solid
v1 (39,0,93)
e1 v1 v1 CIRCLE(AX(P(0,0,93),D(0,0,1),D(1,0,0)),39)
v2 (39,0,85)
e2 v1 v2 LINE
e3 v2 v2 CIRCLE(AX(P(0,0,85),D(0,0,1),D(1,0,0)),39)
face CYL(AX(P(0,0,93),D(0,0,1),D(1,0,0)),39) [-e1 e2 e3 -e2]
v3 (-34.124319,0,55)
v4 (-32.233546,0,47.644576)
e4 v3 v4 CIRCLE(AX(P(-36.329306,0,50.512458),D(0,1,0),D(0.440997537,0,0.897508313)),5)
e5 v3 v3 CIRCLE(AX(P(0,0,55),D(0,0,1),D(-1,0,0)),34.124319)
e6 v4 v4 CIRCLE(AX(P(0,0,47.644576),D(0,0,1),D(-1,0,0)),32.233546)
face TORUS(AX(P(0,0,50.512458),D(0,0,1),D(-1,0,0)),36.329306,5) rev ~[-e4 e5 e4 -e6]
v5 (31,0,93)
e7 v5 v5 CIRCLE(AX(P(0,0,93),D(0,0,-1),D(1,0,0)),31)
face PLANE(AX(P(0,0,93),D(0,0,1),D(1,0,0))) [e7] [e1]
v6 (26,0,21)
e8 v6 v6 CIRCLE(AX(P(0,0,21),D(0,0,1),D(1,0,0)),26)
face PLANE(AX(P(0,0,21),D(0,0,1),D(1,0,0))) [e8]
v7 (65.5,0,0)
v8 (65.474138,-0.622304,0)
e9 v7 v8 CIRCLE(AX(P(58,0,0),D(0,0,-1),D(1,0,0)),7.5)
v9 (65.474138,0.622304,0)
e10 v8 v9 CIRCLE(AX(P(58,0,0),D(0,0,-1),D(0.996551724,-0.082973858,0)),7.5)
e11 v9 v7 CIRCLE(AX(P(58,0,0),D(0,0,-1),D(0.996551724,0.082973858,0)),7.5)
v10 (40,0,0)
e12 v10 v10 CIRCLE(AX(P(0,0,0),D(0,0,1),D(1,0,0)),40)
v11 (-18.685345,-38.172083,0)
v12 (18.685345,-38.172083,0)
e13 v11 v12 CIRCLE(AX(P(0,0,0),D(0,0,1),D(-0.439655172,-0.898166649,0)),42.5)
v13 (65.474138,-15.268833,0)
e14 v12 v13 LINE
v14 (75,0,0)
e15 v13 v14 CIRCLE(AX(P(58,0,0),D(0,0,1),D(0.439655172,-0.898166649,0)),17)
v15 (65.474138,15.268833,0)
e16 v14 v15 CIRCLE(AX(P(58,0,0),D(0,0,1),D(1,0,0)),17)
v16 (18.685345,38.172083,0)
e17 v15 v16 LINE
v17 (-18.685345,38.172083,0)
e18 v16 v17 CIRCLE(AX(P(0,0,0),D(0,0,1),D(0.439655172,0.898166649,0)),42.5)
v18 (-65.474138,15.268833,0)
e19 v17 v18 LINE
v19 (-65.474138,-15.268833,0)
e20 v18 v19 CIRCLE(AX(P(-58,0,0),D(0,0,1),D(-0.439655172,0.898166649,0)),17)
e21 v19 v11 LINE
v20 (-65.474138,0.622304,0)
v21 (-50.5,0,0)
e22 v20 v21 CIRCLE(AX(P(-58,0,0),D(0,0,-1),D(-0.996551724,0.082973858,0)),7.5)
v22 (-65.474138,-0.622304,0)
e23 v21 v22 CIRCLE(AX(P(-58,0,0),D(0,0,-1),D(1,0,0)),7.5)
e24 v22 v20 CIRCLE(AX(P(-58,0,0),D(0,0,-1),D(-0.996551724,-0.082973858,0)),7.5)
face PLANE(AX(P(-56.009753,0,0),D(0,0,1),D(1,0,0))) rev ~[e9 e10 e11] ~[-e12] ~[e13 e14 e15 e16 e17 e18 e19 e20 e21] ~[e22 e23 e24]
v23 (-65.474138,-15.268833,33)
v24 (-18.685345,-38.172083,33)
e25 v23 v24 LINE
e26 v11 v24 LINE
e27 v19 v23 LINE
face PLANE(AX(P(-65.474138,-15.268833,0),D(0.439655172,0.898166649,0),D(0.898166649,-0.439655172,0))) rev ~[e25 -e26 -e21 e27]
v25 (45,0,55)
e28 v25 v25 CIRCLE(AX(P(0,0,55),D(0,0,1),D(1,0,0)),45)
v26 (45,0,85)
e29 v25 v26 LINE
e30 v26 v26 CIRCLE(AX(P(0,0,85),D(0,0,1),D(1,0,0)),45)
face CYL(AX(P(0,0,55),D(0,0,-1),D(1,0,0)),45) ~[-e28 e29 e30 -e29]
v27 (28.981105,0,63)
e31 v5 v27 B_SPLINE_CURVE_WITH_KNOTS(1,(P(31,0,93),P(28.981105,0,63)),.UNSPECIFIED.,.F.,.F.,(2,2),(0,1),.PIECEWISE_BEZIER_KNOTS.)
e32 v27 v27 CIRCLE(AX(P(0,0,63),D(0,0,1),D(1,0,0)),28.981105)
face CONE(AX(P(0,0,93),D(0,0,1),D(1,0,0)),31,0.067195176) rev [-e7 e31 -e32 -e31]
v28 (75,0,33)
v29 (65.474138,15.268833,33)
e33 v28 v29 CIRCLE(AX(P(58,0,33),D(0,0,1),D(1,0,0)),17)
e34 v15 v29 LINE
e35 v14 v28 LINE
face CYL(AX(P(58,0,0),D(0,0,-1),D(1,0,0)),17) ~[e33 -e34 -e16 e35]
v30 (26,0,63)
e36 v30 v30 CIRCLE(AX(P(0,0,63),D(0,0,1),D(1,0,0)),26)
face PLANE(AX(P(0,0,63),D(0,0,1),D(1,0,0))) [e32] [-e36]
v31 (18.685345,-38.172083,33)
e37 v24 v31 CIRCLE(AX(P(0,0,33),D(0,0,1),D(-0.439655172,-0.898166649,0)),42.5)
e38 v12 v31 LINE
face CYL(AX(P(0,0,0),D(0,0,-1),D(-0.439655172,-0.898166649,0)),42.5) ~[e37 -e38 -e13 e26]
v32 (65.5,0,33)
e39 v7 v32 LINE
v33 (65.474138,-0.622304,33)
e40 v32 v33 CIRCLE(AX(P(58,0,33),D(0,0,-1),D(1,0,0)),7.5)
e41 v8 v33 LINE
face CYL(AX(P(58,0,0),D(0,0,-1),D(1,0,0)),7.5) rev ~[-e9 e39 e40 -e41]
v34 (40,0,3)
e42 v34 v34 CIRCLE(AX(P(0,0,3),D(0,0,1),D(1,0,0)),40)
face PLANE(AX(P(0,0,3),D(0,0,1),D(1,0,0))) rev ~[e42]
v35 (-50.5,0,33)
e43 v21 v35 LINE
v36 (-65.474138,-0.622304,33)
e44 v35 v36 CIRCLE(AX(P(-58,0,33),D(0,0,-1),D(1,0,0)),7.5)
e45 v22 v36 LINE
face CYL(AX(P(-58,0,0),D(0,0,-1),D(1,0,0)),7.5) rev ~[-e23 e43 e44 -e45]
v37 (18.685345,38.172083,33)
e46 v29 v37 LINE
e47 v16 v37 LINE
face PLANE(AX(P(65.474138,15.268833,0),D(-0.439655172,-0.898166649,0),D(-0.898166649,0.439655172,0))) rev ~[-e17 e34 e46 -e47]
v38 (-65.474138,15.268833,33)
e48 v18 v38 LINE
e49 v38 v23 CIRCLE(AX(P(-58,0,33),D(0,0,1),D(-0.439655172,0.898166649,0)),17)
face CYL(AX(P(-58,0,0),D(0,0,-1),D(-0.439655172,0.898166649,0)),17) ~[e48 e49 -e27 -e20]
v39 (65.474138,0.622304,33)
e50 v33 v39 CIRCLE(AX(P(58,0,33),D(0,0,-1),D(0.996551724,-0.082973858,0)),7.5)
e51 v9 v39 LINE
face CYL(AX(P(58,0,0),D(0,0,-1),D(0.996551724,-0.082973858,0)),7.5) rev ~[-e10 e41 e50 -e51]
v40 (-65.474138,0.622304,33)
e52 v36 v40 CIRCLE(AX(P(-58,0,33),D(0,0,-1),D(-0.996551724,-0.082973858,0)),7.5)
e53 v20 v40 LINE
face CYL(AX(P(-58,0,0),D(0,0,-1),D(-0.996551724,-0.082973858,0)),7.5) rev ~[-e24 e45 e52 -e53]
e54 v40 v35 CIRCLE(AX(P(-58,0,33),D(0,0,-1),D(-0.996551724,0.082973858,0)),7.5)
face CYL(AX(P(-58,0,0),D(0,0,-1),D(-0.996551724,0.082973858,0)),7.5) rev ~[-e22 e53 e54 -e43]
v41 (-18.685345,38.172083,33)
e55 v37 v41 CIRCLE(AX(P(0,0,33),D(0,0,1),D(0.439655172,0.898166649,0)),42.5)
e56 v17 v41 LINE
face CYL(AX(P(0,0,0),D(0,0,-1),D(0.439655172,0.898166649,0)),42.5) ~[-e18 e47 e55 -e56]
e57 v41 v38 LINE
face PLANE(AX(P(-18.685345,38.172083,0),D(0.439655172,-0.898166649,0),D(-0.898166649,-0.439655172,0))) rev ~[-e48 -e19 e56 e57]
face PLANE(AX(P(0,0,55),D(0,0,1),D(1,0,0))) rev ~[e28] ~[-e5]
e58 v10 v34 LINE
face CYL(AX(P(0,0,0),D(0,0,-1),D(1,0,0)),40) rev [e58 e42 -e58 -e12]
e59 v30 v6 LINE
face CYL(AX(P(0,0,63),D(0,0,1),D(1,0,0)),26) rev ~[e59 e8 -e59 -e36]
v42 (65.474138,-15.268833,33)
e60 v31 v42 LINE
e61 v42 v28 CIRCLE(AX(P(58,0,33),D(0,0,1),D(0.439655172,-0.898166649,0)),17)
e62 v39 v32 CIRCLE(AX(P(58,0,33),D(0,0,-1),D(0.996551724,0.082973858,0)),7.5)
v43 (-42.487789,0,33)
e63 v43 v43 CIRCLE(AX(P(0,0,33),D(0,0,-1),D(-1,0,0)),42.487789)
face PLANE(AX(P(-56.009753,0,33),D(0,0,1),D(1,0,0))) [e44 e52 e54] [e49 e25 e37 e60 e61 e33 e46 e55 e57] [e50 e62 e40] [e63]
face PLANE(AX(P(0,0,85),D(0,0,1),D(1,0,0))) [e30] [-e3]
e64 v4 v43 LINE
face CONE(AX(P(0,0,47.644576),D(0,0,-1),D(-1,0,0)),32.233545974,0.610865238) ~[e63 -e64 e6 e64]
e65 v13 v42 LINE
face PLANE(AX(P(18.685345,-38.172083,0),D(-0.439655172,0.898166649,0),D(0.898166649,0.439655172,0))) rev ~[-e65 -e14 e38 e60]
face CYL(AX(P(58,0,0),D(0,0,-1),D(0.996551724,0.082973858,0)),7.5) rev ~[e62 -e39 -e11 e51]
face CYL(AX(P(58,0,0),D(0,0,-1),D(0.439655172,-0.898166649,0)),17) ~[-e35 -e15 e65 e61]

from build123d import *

# Parameters (mm, degrees)
F1_DEPTH  = 33
F3_R      = 40
F4_DEPTH  = 3
F6_R      = 45
F6_R_2    = 34.1243185103
F7_DEPTH  = 38
F8_R      = 45
F8_R_2    = 39
F9_DEPTH  = 8
F10_R     = 31
F11_DEPTH = 30
F11_TAPER = 3.85
F12_R     = 26
F13_DEPTH = 42


with BuildPart() as f1:
    # F0 (on Top) → F1 (new body)
    with BuildSketch(Plane.XY):
        with BuildLine():
            ThreePointArc((-42.0797413793, -5.9619934125), (-42.5, 0), (-42.0797413793, 5.9619934125))
            ThreePointArc((-42.0797413793, 5.9619934125), (-51.7160080676, 15.7959312924), (-65.474137931, 15.2688330329))
            Line((-65.474137931, 15.2688330329), (-65.474137931, 0.6223039353))
            ThreePointArc((-65.474137931, 0.6223039353), (-57.6885794505, 7.4935316935), (-50.5, 0))
            ThreePointArc((-50.5, 0), (-57.6885794505, -7.4935316935), (-65.474137931, -0.6223039353))
            Line((-65.474137931, -0.6223039353), (-65.474137931, -15.2688330329))
            ThreePointArc((-65.474137931, -15.2688330329), (-51.7160080676, -15.7959312924), (-42.0797413793, -5.9619934125))
        make_face()
        with BuildLine():
            ThreePointArc((-18.6853448276, -38.1720825824), (-34.3870816807, -24.9755603237), (-42.0797413793, -5.9619934125))
            ThreePointArc((-42.0797413793, -5.9619934125), (-51.7160080676, -15.7959312924), (-65.474137931, -15.2688330329))
            Line((-65.474137931, -15.2688330329), (-18.6853448276, -38.1720825824))
        make_face()
        with BuildLine():
            Line((-65.474137931, 0.6223039353), (-65.474137931, 15.2688330329))
            ThreePointArc((-65.474137931, 15.2688330329), (-75, 0), (-65.474137931, -15.2688330329))
            Line((-65.474137931, -15.2688330329), (-65.474137931, -0.6223039353))
            ThreePointArc((-65.474137931, -0.6223039353), (-65.5, 0), (-65.474137931, 0.6223039353))
        make_face()
        with BuildLine():
            Line((65.474137931, 15.2688330329), (18.6853448276, 38.1720825824))
            ThreePointArc((18.6853448276, 38.1720825824), (34.3870816807, 24.9755603237), (42.0797413793, 5.9619934125))
            ThreePointArc((42.0797413793, 5.9619934125), (51.7160080676, 15.7959312924), (65.474137931, 15.2688330329))
        make_face()
        with BuildLine():
            ThreePointArc((75, 0), (72.4232511042, 8.9983235987), (65.474137931, 15.2688330329))
            Line((65.474137931, 15.2688330329), (65.474137931, 0.6223039353))
            ThreePointArc((65.474137931, 0.6223039353), (65.4935316935, 0.3114205495), (65.5, 0))
            ThreePointArc((65.5, 0), (65.4935316935, -0.3114205495), (65.474137931, -0.6223039353))
            Line((65.474137931, -0.6223039353), (65.474137931, -15.2688330329))
            ThreePointArc((65.474137931, -15.2688330329), (72.4232511042, -8.9983235987), (75, 0))
        make_face()
        with BuildLine():
            ThreePointArc((42.0797413793, 5.9619934125), (34.3870816807, 24.9755603237), (18.6853448276, 38.1720825824))
            ThreePointArc((18.6853448276, 38.1720825824), (0, 42.5), (-18.6853448276, 38.1720825824))
            ThreePointArc((-18.6853448276, 38.1720825824), (-34.3870816807, 24.9755603237), (-42.0797413793, 5.9619934125))
            ThreePointArc((-42.0797413793, 5.9619934125), (-41.2721131557, 3.0294886902), (-41, 0))
            ThreePointArc((-41, 0), (-41.2721131557, -3.0294886902), (-42.0797413793, -5.9619934125))
            ThreePointArc((-42.0797413793, -5.9619934125), (-34.3870816807, -24.9755603237), (-18.6853448276, -38.1720825824))
            ThreePointArc((-18.6853448276, -38.1720825824), (0, -42.5), (18.6853448276, -38.1720825824))
            ThreePointArc((18.6853448276, -38.1720825824), (34.3870816807, -24.9755603237), (42.0797413793, -5.9619934125))
            ThreePointArc((42.0797413793, -5.9619934125), (41, 0), (42.0797413793, 5.9619934125))
        make_face()
        with BuildLine():
            ThreePointArc((42.5, 0), (42.3948051571, 2.9883934965), (42.0797413793, 5.9619934125))
            ThreePointArc((42.0797413793, 5.9619934125), (41, 0), (42.0797413793, -5.9619934125))
            ThreePointArc((42.0797413793, -5.9619934125), (42.3948051571, -2.9883934965), (42.5, 0))
        make_face()
        with BuildLine():
            ThreePointArc((65.474137931, 15.2688330329), (51.7160080676, 15.7959312924), (42.0797413793, 5.9619934125))
            ThreePointArc((42.0797413793, 5.9619934125), (42.3948051571, 2.9883934965), (42.5, 0))
            ThreePointArc((42.5, 0), (42.3948051571, -2.9883934965), (42.0797413793, -5.9619934125))
            ThreePointArc((42.0797413793, -5.9619934125), (51.7160080676, -15.7959312924), (65.474137931, -15.2688330329))
            Line((65.474137931, -15.2688330329), (65.474137931, -0.6223039353))
            ThreePointArc((65.474137931, -0.6223039353), (50.5, 0), (65.474137931, 0.6223039353))
            Line((65.474137931, 0.6223039353), (65.474137931, 15.2688330329))
        make_face()
        with BuildLine():
            ThreePointArc((65.474137931, -15.2688330329), (51.7160080676, -15.7959312924), (42.0797413793, -5.9619934125))
            ThreePointArc((42.0797413793, -5.9619934125), (34.3870816807, -24.9755603237), (18.6853448276, -38.1720825824))
            Line((18.6853448276, -38.1720825824), (65.474137931, -15.2688330329))
        make_face()
        with BuildLine():
            ThreePointArc((-42.0797413793, 5.9619934125), (-34.3870816807, 24.9755603237), (-18.6853448276, 38.1720825824))
            Line((-18.6853448276, 38.1720825824), (-65.474137931, 15.2688330329))
            ThreePointArc((-65.474137931, 15.2688330329), (-51.7160080676, 15.7959312924), (-42.0797413793, 5.9619934125))
        make_face()
        with BuildLine():
            ThreePointArc((-41, 0), (-41.2721131557, 3.0294886902), (-42.0797413793, 5.9619934125))
            ThreePointArc((-42.0797413793, 5.9619934125), (-42.5, 0), (-42.0797413793, -5.9619934125))
            ThreePointArc((-42.0797413793, -5.9619934125), (-41.2721131557, -3.0294886902), (-41, 0))
        make_face()
    extrude(amount=F1_DEPTH)

    # F3 (on face) → F4 (cut)
    with BuildSketch(Plane.XY):
        Circle(F3_R)
    extrude(amount=F4_DEPTH, mode=Mode.SUBTRACT)

    # F2 (on Front) → F5 (revolve)
    with BuildSketch(Plane.XZ):
        with BuildLine():
            Line((-42.499996424, 32.9825655057), (0, 33))
            Line((0, 33), (0, 55))
            Line((0, 55), (-27.083222819, 55))
            Line((-27.083222819, 55), (-34.1243185103, 55))
            ThreePointArc((-34.1243185103, 55), (-31.4867427552, 51.7572794356), (-32.2335459741, 47.6445762521))
            Line((-32.2335459741, 47.6445762521), (-42.499996424, 32.9825655057))
        make_face()
    revolve(axis=Axis((0, 0, 44), (0, 0, 1)))

    # F6 (on face) → F7 (join)
    with BuildSketch(Plane.XY.offset(55)):
        Circle(F6_R)
        Circle(F6_R_2, mode=Mode.SUBTRACT)
        Circle(F6_R_2)
    extrude(amount=F7_DEPTH)

    # F8 (on face) → F9 (cut)
    with BuildSketch(Plane.XY.offset(93)):
        Circle(F8_R)
        Circle(F8_R_2, mode=Mode.SUBTRACT)
    extrude(amount=-F9_DEPTH, mode=Mode.SUBTRACT)

    # F10 (on face) → F11 (cut)
    with BuildSketch(Plane.XY.offset(93)):
        Circle(F10_R)
    extrude(amount=-F11_DEPTH, taper=F11_TAPER, mode=Mode.SUBTRACT)

    # F12 (on face) → F13 (cut)
    with BuildSketch(Plane.XY.offset(63)):
        Circle(F12_R)
    extrude(amount=-F13_DEPTH, mode=Mode.SUBTRACT)


solid = f1.part
